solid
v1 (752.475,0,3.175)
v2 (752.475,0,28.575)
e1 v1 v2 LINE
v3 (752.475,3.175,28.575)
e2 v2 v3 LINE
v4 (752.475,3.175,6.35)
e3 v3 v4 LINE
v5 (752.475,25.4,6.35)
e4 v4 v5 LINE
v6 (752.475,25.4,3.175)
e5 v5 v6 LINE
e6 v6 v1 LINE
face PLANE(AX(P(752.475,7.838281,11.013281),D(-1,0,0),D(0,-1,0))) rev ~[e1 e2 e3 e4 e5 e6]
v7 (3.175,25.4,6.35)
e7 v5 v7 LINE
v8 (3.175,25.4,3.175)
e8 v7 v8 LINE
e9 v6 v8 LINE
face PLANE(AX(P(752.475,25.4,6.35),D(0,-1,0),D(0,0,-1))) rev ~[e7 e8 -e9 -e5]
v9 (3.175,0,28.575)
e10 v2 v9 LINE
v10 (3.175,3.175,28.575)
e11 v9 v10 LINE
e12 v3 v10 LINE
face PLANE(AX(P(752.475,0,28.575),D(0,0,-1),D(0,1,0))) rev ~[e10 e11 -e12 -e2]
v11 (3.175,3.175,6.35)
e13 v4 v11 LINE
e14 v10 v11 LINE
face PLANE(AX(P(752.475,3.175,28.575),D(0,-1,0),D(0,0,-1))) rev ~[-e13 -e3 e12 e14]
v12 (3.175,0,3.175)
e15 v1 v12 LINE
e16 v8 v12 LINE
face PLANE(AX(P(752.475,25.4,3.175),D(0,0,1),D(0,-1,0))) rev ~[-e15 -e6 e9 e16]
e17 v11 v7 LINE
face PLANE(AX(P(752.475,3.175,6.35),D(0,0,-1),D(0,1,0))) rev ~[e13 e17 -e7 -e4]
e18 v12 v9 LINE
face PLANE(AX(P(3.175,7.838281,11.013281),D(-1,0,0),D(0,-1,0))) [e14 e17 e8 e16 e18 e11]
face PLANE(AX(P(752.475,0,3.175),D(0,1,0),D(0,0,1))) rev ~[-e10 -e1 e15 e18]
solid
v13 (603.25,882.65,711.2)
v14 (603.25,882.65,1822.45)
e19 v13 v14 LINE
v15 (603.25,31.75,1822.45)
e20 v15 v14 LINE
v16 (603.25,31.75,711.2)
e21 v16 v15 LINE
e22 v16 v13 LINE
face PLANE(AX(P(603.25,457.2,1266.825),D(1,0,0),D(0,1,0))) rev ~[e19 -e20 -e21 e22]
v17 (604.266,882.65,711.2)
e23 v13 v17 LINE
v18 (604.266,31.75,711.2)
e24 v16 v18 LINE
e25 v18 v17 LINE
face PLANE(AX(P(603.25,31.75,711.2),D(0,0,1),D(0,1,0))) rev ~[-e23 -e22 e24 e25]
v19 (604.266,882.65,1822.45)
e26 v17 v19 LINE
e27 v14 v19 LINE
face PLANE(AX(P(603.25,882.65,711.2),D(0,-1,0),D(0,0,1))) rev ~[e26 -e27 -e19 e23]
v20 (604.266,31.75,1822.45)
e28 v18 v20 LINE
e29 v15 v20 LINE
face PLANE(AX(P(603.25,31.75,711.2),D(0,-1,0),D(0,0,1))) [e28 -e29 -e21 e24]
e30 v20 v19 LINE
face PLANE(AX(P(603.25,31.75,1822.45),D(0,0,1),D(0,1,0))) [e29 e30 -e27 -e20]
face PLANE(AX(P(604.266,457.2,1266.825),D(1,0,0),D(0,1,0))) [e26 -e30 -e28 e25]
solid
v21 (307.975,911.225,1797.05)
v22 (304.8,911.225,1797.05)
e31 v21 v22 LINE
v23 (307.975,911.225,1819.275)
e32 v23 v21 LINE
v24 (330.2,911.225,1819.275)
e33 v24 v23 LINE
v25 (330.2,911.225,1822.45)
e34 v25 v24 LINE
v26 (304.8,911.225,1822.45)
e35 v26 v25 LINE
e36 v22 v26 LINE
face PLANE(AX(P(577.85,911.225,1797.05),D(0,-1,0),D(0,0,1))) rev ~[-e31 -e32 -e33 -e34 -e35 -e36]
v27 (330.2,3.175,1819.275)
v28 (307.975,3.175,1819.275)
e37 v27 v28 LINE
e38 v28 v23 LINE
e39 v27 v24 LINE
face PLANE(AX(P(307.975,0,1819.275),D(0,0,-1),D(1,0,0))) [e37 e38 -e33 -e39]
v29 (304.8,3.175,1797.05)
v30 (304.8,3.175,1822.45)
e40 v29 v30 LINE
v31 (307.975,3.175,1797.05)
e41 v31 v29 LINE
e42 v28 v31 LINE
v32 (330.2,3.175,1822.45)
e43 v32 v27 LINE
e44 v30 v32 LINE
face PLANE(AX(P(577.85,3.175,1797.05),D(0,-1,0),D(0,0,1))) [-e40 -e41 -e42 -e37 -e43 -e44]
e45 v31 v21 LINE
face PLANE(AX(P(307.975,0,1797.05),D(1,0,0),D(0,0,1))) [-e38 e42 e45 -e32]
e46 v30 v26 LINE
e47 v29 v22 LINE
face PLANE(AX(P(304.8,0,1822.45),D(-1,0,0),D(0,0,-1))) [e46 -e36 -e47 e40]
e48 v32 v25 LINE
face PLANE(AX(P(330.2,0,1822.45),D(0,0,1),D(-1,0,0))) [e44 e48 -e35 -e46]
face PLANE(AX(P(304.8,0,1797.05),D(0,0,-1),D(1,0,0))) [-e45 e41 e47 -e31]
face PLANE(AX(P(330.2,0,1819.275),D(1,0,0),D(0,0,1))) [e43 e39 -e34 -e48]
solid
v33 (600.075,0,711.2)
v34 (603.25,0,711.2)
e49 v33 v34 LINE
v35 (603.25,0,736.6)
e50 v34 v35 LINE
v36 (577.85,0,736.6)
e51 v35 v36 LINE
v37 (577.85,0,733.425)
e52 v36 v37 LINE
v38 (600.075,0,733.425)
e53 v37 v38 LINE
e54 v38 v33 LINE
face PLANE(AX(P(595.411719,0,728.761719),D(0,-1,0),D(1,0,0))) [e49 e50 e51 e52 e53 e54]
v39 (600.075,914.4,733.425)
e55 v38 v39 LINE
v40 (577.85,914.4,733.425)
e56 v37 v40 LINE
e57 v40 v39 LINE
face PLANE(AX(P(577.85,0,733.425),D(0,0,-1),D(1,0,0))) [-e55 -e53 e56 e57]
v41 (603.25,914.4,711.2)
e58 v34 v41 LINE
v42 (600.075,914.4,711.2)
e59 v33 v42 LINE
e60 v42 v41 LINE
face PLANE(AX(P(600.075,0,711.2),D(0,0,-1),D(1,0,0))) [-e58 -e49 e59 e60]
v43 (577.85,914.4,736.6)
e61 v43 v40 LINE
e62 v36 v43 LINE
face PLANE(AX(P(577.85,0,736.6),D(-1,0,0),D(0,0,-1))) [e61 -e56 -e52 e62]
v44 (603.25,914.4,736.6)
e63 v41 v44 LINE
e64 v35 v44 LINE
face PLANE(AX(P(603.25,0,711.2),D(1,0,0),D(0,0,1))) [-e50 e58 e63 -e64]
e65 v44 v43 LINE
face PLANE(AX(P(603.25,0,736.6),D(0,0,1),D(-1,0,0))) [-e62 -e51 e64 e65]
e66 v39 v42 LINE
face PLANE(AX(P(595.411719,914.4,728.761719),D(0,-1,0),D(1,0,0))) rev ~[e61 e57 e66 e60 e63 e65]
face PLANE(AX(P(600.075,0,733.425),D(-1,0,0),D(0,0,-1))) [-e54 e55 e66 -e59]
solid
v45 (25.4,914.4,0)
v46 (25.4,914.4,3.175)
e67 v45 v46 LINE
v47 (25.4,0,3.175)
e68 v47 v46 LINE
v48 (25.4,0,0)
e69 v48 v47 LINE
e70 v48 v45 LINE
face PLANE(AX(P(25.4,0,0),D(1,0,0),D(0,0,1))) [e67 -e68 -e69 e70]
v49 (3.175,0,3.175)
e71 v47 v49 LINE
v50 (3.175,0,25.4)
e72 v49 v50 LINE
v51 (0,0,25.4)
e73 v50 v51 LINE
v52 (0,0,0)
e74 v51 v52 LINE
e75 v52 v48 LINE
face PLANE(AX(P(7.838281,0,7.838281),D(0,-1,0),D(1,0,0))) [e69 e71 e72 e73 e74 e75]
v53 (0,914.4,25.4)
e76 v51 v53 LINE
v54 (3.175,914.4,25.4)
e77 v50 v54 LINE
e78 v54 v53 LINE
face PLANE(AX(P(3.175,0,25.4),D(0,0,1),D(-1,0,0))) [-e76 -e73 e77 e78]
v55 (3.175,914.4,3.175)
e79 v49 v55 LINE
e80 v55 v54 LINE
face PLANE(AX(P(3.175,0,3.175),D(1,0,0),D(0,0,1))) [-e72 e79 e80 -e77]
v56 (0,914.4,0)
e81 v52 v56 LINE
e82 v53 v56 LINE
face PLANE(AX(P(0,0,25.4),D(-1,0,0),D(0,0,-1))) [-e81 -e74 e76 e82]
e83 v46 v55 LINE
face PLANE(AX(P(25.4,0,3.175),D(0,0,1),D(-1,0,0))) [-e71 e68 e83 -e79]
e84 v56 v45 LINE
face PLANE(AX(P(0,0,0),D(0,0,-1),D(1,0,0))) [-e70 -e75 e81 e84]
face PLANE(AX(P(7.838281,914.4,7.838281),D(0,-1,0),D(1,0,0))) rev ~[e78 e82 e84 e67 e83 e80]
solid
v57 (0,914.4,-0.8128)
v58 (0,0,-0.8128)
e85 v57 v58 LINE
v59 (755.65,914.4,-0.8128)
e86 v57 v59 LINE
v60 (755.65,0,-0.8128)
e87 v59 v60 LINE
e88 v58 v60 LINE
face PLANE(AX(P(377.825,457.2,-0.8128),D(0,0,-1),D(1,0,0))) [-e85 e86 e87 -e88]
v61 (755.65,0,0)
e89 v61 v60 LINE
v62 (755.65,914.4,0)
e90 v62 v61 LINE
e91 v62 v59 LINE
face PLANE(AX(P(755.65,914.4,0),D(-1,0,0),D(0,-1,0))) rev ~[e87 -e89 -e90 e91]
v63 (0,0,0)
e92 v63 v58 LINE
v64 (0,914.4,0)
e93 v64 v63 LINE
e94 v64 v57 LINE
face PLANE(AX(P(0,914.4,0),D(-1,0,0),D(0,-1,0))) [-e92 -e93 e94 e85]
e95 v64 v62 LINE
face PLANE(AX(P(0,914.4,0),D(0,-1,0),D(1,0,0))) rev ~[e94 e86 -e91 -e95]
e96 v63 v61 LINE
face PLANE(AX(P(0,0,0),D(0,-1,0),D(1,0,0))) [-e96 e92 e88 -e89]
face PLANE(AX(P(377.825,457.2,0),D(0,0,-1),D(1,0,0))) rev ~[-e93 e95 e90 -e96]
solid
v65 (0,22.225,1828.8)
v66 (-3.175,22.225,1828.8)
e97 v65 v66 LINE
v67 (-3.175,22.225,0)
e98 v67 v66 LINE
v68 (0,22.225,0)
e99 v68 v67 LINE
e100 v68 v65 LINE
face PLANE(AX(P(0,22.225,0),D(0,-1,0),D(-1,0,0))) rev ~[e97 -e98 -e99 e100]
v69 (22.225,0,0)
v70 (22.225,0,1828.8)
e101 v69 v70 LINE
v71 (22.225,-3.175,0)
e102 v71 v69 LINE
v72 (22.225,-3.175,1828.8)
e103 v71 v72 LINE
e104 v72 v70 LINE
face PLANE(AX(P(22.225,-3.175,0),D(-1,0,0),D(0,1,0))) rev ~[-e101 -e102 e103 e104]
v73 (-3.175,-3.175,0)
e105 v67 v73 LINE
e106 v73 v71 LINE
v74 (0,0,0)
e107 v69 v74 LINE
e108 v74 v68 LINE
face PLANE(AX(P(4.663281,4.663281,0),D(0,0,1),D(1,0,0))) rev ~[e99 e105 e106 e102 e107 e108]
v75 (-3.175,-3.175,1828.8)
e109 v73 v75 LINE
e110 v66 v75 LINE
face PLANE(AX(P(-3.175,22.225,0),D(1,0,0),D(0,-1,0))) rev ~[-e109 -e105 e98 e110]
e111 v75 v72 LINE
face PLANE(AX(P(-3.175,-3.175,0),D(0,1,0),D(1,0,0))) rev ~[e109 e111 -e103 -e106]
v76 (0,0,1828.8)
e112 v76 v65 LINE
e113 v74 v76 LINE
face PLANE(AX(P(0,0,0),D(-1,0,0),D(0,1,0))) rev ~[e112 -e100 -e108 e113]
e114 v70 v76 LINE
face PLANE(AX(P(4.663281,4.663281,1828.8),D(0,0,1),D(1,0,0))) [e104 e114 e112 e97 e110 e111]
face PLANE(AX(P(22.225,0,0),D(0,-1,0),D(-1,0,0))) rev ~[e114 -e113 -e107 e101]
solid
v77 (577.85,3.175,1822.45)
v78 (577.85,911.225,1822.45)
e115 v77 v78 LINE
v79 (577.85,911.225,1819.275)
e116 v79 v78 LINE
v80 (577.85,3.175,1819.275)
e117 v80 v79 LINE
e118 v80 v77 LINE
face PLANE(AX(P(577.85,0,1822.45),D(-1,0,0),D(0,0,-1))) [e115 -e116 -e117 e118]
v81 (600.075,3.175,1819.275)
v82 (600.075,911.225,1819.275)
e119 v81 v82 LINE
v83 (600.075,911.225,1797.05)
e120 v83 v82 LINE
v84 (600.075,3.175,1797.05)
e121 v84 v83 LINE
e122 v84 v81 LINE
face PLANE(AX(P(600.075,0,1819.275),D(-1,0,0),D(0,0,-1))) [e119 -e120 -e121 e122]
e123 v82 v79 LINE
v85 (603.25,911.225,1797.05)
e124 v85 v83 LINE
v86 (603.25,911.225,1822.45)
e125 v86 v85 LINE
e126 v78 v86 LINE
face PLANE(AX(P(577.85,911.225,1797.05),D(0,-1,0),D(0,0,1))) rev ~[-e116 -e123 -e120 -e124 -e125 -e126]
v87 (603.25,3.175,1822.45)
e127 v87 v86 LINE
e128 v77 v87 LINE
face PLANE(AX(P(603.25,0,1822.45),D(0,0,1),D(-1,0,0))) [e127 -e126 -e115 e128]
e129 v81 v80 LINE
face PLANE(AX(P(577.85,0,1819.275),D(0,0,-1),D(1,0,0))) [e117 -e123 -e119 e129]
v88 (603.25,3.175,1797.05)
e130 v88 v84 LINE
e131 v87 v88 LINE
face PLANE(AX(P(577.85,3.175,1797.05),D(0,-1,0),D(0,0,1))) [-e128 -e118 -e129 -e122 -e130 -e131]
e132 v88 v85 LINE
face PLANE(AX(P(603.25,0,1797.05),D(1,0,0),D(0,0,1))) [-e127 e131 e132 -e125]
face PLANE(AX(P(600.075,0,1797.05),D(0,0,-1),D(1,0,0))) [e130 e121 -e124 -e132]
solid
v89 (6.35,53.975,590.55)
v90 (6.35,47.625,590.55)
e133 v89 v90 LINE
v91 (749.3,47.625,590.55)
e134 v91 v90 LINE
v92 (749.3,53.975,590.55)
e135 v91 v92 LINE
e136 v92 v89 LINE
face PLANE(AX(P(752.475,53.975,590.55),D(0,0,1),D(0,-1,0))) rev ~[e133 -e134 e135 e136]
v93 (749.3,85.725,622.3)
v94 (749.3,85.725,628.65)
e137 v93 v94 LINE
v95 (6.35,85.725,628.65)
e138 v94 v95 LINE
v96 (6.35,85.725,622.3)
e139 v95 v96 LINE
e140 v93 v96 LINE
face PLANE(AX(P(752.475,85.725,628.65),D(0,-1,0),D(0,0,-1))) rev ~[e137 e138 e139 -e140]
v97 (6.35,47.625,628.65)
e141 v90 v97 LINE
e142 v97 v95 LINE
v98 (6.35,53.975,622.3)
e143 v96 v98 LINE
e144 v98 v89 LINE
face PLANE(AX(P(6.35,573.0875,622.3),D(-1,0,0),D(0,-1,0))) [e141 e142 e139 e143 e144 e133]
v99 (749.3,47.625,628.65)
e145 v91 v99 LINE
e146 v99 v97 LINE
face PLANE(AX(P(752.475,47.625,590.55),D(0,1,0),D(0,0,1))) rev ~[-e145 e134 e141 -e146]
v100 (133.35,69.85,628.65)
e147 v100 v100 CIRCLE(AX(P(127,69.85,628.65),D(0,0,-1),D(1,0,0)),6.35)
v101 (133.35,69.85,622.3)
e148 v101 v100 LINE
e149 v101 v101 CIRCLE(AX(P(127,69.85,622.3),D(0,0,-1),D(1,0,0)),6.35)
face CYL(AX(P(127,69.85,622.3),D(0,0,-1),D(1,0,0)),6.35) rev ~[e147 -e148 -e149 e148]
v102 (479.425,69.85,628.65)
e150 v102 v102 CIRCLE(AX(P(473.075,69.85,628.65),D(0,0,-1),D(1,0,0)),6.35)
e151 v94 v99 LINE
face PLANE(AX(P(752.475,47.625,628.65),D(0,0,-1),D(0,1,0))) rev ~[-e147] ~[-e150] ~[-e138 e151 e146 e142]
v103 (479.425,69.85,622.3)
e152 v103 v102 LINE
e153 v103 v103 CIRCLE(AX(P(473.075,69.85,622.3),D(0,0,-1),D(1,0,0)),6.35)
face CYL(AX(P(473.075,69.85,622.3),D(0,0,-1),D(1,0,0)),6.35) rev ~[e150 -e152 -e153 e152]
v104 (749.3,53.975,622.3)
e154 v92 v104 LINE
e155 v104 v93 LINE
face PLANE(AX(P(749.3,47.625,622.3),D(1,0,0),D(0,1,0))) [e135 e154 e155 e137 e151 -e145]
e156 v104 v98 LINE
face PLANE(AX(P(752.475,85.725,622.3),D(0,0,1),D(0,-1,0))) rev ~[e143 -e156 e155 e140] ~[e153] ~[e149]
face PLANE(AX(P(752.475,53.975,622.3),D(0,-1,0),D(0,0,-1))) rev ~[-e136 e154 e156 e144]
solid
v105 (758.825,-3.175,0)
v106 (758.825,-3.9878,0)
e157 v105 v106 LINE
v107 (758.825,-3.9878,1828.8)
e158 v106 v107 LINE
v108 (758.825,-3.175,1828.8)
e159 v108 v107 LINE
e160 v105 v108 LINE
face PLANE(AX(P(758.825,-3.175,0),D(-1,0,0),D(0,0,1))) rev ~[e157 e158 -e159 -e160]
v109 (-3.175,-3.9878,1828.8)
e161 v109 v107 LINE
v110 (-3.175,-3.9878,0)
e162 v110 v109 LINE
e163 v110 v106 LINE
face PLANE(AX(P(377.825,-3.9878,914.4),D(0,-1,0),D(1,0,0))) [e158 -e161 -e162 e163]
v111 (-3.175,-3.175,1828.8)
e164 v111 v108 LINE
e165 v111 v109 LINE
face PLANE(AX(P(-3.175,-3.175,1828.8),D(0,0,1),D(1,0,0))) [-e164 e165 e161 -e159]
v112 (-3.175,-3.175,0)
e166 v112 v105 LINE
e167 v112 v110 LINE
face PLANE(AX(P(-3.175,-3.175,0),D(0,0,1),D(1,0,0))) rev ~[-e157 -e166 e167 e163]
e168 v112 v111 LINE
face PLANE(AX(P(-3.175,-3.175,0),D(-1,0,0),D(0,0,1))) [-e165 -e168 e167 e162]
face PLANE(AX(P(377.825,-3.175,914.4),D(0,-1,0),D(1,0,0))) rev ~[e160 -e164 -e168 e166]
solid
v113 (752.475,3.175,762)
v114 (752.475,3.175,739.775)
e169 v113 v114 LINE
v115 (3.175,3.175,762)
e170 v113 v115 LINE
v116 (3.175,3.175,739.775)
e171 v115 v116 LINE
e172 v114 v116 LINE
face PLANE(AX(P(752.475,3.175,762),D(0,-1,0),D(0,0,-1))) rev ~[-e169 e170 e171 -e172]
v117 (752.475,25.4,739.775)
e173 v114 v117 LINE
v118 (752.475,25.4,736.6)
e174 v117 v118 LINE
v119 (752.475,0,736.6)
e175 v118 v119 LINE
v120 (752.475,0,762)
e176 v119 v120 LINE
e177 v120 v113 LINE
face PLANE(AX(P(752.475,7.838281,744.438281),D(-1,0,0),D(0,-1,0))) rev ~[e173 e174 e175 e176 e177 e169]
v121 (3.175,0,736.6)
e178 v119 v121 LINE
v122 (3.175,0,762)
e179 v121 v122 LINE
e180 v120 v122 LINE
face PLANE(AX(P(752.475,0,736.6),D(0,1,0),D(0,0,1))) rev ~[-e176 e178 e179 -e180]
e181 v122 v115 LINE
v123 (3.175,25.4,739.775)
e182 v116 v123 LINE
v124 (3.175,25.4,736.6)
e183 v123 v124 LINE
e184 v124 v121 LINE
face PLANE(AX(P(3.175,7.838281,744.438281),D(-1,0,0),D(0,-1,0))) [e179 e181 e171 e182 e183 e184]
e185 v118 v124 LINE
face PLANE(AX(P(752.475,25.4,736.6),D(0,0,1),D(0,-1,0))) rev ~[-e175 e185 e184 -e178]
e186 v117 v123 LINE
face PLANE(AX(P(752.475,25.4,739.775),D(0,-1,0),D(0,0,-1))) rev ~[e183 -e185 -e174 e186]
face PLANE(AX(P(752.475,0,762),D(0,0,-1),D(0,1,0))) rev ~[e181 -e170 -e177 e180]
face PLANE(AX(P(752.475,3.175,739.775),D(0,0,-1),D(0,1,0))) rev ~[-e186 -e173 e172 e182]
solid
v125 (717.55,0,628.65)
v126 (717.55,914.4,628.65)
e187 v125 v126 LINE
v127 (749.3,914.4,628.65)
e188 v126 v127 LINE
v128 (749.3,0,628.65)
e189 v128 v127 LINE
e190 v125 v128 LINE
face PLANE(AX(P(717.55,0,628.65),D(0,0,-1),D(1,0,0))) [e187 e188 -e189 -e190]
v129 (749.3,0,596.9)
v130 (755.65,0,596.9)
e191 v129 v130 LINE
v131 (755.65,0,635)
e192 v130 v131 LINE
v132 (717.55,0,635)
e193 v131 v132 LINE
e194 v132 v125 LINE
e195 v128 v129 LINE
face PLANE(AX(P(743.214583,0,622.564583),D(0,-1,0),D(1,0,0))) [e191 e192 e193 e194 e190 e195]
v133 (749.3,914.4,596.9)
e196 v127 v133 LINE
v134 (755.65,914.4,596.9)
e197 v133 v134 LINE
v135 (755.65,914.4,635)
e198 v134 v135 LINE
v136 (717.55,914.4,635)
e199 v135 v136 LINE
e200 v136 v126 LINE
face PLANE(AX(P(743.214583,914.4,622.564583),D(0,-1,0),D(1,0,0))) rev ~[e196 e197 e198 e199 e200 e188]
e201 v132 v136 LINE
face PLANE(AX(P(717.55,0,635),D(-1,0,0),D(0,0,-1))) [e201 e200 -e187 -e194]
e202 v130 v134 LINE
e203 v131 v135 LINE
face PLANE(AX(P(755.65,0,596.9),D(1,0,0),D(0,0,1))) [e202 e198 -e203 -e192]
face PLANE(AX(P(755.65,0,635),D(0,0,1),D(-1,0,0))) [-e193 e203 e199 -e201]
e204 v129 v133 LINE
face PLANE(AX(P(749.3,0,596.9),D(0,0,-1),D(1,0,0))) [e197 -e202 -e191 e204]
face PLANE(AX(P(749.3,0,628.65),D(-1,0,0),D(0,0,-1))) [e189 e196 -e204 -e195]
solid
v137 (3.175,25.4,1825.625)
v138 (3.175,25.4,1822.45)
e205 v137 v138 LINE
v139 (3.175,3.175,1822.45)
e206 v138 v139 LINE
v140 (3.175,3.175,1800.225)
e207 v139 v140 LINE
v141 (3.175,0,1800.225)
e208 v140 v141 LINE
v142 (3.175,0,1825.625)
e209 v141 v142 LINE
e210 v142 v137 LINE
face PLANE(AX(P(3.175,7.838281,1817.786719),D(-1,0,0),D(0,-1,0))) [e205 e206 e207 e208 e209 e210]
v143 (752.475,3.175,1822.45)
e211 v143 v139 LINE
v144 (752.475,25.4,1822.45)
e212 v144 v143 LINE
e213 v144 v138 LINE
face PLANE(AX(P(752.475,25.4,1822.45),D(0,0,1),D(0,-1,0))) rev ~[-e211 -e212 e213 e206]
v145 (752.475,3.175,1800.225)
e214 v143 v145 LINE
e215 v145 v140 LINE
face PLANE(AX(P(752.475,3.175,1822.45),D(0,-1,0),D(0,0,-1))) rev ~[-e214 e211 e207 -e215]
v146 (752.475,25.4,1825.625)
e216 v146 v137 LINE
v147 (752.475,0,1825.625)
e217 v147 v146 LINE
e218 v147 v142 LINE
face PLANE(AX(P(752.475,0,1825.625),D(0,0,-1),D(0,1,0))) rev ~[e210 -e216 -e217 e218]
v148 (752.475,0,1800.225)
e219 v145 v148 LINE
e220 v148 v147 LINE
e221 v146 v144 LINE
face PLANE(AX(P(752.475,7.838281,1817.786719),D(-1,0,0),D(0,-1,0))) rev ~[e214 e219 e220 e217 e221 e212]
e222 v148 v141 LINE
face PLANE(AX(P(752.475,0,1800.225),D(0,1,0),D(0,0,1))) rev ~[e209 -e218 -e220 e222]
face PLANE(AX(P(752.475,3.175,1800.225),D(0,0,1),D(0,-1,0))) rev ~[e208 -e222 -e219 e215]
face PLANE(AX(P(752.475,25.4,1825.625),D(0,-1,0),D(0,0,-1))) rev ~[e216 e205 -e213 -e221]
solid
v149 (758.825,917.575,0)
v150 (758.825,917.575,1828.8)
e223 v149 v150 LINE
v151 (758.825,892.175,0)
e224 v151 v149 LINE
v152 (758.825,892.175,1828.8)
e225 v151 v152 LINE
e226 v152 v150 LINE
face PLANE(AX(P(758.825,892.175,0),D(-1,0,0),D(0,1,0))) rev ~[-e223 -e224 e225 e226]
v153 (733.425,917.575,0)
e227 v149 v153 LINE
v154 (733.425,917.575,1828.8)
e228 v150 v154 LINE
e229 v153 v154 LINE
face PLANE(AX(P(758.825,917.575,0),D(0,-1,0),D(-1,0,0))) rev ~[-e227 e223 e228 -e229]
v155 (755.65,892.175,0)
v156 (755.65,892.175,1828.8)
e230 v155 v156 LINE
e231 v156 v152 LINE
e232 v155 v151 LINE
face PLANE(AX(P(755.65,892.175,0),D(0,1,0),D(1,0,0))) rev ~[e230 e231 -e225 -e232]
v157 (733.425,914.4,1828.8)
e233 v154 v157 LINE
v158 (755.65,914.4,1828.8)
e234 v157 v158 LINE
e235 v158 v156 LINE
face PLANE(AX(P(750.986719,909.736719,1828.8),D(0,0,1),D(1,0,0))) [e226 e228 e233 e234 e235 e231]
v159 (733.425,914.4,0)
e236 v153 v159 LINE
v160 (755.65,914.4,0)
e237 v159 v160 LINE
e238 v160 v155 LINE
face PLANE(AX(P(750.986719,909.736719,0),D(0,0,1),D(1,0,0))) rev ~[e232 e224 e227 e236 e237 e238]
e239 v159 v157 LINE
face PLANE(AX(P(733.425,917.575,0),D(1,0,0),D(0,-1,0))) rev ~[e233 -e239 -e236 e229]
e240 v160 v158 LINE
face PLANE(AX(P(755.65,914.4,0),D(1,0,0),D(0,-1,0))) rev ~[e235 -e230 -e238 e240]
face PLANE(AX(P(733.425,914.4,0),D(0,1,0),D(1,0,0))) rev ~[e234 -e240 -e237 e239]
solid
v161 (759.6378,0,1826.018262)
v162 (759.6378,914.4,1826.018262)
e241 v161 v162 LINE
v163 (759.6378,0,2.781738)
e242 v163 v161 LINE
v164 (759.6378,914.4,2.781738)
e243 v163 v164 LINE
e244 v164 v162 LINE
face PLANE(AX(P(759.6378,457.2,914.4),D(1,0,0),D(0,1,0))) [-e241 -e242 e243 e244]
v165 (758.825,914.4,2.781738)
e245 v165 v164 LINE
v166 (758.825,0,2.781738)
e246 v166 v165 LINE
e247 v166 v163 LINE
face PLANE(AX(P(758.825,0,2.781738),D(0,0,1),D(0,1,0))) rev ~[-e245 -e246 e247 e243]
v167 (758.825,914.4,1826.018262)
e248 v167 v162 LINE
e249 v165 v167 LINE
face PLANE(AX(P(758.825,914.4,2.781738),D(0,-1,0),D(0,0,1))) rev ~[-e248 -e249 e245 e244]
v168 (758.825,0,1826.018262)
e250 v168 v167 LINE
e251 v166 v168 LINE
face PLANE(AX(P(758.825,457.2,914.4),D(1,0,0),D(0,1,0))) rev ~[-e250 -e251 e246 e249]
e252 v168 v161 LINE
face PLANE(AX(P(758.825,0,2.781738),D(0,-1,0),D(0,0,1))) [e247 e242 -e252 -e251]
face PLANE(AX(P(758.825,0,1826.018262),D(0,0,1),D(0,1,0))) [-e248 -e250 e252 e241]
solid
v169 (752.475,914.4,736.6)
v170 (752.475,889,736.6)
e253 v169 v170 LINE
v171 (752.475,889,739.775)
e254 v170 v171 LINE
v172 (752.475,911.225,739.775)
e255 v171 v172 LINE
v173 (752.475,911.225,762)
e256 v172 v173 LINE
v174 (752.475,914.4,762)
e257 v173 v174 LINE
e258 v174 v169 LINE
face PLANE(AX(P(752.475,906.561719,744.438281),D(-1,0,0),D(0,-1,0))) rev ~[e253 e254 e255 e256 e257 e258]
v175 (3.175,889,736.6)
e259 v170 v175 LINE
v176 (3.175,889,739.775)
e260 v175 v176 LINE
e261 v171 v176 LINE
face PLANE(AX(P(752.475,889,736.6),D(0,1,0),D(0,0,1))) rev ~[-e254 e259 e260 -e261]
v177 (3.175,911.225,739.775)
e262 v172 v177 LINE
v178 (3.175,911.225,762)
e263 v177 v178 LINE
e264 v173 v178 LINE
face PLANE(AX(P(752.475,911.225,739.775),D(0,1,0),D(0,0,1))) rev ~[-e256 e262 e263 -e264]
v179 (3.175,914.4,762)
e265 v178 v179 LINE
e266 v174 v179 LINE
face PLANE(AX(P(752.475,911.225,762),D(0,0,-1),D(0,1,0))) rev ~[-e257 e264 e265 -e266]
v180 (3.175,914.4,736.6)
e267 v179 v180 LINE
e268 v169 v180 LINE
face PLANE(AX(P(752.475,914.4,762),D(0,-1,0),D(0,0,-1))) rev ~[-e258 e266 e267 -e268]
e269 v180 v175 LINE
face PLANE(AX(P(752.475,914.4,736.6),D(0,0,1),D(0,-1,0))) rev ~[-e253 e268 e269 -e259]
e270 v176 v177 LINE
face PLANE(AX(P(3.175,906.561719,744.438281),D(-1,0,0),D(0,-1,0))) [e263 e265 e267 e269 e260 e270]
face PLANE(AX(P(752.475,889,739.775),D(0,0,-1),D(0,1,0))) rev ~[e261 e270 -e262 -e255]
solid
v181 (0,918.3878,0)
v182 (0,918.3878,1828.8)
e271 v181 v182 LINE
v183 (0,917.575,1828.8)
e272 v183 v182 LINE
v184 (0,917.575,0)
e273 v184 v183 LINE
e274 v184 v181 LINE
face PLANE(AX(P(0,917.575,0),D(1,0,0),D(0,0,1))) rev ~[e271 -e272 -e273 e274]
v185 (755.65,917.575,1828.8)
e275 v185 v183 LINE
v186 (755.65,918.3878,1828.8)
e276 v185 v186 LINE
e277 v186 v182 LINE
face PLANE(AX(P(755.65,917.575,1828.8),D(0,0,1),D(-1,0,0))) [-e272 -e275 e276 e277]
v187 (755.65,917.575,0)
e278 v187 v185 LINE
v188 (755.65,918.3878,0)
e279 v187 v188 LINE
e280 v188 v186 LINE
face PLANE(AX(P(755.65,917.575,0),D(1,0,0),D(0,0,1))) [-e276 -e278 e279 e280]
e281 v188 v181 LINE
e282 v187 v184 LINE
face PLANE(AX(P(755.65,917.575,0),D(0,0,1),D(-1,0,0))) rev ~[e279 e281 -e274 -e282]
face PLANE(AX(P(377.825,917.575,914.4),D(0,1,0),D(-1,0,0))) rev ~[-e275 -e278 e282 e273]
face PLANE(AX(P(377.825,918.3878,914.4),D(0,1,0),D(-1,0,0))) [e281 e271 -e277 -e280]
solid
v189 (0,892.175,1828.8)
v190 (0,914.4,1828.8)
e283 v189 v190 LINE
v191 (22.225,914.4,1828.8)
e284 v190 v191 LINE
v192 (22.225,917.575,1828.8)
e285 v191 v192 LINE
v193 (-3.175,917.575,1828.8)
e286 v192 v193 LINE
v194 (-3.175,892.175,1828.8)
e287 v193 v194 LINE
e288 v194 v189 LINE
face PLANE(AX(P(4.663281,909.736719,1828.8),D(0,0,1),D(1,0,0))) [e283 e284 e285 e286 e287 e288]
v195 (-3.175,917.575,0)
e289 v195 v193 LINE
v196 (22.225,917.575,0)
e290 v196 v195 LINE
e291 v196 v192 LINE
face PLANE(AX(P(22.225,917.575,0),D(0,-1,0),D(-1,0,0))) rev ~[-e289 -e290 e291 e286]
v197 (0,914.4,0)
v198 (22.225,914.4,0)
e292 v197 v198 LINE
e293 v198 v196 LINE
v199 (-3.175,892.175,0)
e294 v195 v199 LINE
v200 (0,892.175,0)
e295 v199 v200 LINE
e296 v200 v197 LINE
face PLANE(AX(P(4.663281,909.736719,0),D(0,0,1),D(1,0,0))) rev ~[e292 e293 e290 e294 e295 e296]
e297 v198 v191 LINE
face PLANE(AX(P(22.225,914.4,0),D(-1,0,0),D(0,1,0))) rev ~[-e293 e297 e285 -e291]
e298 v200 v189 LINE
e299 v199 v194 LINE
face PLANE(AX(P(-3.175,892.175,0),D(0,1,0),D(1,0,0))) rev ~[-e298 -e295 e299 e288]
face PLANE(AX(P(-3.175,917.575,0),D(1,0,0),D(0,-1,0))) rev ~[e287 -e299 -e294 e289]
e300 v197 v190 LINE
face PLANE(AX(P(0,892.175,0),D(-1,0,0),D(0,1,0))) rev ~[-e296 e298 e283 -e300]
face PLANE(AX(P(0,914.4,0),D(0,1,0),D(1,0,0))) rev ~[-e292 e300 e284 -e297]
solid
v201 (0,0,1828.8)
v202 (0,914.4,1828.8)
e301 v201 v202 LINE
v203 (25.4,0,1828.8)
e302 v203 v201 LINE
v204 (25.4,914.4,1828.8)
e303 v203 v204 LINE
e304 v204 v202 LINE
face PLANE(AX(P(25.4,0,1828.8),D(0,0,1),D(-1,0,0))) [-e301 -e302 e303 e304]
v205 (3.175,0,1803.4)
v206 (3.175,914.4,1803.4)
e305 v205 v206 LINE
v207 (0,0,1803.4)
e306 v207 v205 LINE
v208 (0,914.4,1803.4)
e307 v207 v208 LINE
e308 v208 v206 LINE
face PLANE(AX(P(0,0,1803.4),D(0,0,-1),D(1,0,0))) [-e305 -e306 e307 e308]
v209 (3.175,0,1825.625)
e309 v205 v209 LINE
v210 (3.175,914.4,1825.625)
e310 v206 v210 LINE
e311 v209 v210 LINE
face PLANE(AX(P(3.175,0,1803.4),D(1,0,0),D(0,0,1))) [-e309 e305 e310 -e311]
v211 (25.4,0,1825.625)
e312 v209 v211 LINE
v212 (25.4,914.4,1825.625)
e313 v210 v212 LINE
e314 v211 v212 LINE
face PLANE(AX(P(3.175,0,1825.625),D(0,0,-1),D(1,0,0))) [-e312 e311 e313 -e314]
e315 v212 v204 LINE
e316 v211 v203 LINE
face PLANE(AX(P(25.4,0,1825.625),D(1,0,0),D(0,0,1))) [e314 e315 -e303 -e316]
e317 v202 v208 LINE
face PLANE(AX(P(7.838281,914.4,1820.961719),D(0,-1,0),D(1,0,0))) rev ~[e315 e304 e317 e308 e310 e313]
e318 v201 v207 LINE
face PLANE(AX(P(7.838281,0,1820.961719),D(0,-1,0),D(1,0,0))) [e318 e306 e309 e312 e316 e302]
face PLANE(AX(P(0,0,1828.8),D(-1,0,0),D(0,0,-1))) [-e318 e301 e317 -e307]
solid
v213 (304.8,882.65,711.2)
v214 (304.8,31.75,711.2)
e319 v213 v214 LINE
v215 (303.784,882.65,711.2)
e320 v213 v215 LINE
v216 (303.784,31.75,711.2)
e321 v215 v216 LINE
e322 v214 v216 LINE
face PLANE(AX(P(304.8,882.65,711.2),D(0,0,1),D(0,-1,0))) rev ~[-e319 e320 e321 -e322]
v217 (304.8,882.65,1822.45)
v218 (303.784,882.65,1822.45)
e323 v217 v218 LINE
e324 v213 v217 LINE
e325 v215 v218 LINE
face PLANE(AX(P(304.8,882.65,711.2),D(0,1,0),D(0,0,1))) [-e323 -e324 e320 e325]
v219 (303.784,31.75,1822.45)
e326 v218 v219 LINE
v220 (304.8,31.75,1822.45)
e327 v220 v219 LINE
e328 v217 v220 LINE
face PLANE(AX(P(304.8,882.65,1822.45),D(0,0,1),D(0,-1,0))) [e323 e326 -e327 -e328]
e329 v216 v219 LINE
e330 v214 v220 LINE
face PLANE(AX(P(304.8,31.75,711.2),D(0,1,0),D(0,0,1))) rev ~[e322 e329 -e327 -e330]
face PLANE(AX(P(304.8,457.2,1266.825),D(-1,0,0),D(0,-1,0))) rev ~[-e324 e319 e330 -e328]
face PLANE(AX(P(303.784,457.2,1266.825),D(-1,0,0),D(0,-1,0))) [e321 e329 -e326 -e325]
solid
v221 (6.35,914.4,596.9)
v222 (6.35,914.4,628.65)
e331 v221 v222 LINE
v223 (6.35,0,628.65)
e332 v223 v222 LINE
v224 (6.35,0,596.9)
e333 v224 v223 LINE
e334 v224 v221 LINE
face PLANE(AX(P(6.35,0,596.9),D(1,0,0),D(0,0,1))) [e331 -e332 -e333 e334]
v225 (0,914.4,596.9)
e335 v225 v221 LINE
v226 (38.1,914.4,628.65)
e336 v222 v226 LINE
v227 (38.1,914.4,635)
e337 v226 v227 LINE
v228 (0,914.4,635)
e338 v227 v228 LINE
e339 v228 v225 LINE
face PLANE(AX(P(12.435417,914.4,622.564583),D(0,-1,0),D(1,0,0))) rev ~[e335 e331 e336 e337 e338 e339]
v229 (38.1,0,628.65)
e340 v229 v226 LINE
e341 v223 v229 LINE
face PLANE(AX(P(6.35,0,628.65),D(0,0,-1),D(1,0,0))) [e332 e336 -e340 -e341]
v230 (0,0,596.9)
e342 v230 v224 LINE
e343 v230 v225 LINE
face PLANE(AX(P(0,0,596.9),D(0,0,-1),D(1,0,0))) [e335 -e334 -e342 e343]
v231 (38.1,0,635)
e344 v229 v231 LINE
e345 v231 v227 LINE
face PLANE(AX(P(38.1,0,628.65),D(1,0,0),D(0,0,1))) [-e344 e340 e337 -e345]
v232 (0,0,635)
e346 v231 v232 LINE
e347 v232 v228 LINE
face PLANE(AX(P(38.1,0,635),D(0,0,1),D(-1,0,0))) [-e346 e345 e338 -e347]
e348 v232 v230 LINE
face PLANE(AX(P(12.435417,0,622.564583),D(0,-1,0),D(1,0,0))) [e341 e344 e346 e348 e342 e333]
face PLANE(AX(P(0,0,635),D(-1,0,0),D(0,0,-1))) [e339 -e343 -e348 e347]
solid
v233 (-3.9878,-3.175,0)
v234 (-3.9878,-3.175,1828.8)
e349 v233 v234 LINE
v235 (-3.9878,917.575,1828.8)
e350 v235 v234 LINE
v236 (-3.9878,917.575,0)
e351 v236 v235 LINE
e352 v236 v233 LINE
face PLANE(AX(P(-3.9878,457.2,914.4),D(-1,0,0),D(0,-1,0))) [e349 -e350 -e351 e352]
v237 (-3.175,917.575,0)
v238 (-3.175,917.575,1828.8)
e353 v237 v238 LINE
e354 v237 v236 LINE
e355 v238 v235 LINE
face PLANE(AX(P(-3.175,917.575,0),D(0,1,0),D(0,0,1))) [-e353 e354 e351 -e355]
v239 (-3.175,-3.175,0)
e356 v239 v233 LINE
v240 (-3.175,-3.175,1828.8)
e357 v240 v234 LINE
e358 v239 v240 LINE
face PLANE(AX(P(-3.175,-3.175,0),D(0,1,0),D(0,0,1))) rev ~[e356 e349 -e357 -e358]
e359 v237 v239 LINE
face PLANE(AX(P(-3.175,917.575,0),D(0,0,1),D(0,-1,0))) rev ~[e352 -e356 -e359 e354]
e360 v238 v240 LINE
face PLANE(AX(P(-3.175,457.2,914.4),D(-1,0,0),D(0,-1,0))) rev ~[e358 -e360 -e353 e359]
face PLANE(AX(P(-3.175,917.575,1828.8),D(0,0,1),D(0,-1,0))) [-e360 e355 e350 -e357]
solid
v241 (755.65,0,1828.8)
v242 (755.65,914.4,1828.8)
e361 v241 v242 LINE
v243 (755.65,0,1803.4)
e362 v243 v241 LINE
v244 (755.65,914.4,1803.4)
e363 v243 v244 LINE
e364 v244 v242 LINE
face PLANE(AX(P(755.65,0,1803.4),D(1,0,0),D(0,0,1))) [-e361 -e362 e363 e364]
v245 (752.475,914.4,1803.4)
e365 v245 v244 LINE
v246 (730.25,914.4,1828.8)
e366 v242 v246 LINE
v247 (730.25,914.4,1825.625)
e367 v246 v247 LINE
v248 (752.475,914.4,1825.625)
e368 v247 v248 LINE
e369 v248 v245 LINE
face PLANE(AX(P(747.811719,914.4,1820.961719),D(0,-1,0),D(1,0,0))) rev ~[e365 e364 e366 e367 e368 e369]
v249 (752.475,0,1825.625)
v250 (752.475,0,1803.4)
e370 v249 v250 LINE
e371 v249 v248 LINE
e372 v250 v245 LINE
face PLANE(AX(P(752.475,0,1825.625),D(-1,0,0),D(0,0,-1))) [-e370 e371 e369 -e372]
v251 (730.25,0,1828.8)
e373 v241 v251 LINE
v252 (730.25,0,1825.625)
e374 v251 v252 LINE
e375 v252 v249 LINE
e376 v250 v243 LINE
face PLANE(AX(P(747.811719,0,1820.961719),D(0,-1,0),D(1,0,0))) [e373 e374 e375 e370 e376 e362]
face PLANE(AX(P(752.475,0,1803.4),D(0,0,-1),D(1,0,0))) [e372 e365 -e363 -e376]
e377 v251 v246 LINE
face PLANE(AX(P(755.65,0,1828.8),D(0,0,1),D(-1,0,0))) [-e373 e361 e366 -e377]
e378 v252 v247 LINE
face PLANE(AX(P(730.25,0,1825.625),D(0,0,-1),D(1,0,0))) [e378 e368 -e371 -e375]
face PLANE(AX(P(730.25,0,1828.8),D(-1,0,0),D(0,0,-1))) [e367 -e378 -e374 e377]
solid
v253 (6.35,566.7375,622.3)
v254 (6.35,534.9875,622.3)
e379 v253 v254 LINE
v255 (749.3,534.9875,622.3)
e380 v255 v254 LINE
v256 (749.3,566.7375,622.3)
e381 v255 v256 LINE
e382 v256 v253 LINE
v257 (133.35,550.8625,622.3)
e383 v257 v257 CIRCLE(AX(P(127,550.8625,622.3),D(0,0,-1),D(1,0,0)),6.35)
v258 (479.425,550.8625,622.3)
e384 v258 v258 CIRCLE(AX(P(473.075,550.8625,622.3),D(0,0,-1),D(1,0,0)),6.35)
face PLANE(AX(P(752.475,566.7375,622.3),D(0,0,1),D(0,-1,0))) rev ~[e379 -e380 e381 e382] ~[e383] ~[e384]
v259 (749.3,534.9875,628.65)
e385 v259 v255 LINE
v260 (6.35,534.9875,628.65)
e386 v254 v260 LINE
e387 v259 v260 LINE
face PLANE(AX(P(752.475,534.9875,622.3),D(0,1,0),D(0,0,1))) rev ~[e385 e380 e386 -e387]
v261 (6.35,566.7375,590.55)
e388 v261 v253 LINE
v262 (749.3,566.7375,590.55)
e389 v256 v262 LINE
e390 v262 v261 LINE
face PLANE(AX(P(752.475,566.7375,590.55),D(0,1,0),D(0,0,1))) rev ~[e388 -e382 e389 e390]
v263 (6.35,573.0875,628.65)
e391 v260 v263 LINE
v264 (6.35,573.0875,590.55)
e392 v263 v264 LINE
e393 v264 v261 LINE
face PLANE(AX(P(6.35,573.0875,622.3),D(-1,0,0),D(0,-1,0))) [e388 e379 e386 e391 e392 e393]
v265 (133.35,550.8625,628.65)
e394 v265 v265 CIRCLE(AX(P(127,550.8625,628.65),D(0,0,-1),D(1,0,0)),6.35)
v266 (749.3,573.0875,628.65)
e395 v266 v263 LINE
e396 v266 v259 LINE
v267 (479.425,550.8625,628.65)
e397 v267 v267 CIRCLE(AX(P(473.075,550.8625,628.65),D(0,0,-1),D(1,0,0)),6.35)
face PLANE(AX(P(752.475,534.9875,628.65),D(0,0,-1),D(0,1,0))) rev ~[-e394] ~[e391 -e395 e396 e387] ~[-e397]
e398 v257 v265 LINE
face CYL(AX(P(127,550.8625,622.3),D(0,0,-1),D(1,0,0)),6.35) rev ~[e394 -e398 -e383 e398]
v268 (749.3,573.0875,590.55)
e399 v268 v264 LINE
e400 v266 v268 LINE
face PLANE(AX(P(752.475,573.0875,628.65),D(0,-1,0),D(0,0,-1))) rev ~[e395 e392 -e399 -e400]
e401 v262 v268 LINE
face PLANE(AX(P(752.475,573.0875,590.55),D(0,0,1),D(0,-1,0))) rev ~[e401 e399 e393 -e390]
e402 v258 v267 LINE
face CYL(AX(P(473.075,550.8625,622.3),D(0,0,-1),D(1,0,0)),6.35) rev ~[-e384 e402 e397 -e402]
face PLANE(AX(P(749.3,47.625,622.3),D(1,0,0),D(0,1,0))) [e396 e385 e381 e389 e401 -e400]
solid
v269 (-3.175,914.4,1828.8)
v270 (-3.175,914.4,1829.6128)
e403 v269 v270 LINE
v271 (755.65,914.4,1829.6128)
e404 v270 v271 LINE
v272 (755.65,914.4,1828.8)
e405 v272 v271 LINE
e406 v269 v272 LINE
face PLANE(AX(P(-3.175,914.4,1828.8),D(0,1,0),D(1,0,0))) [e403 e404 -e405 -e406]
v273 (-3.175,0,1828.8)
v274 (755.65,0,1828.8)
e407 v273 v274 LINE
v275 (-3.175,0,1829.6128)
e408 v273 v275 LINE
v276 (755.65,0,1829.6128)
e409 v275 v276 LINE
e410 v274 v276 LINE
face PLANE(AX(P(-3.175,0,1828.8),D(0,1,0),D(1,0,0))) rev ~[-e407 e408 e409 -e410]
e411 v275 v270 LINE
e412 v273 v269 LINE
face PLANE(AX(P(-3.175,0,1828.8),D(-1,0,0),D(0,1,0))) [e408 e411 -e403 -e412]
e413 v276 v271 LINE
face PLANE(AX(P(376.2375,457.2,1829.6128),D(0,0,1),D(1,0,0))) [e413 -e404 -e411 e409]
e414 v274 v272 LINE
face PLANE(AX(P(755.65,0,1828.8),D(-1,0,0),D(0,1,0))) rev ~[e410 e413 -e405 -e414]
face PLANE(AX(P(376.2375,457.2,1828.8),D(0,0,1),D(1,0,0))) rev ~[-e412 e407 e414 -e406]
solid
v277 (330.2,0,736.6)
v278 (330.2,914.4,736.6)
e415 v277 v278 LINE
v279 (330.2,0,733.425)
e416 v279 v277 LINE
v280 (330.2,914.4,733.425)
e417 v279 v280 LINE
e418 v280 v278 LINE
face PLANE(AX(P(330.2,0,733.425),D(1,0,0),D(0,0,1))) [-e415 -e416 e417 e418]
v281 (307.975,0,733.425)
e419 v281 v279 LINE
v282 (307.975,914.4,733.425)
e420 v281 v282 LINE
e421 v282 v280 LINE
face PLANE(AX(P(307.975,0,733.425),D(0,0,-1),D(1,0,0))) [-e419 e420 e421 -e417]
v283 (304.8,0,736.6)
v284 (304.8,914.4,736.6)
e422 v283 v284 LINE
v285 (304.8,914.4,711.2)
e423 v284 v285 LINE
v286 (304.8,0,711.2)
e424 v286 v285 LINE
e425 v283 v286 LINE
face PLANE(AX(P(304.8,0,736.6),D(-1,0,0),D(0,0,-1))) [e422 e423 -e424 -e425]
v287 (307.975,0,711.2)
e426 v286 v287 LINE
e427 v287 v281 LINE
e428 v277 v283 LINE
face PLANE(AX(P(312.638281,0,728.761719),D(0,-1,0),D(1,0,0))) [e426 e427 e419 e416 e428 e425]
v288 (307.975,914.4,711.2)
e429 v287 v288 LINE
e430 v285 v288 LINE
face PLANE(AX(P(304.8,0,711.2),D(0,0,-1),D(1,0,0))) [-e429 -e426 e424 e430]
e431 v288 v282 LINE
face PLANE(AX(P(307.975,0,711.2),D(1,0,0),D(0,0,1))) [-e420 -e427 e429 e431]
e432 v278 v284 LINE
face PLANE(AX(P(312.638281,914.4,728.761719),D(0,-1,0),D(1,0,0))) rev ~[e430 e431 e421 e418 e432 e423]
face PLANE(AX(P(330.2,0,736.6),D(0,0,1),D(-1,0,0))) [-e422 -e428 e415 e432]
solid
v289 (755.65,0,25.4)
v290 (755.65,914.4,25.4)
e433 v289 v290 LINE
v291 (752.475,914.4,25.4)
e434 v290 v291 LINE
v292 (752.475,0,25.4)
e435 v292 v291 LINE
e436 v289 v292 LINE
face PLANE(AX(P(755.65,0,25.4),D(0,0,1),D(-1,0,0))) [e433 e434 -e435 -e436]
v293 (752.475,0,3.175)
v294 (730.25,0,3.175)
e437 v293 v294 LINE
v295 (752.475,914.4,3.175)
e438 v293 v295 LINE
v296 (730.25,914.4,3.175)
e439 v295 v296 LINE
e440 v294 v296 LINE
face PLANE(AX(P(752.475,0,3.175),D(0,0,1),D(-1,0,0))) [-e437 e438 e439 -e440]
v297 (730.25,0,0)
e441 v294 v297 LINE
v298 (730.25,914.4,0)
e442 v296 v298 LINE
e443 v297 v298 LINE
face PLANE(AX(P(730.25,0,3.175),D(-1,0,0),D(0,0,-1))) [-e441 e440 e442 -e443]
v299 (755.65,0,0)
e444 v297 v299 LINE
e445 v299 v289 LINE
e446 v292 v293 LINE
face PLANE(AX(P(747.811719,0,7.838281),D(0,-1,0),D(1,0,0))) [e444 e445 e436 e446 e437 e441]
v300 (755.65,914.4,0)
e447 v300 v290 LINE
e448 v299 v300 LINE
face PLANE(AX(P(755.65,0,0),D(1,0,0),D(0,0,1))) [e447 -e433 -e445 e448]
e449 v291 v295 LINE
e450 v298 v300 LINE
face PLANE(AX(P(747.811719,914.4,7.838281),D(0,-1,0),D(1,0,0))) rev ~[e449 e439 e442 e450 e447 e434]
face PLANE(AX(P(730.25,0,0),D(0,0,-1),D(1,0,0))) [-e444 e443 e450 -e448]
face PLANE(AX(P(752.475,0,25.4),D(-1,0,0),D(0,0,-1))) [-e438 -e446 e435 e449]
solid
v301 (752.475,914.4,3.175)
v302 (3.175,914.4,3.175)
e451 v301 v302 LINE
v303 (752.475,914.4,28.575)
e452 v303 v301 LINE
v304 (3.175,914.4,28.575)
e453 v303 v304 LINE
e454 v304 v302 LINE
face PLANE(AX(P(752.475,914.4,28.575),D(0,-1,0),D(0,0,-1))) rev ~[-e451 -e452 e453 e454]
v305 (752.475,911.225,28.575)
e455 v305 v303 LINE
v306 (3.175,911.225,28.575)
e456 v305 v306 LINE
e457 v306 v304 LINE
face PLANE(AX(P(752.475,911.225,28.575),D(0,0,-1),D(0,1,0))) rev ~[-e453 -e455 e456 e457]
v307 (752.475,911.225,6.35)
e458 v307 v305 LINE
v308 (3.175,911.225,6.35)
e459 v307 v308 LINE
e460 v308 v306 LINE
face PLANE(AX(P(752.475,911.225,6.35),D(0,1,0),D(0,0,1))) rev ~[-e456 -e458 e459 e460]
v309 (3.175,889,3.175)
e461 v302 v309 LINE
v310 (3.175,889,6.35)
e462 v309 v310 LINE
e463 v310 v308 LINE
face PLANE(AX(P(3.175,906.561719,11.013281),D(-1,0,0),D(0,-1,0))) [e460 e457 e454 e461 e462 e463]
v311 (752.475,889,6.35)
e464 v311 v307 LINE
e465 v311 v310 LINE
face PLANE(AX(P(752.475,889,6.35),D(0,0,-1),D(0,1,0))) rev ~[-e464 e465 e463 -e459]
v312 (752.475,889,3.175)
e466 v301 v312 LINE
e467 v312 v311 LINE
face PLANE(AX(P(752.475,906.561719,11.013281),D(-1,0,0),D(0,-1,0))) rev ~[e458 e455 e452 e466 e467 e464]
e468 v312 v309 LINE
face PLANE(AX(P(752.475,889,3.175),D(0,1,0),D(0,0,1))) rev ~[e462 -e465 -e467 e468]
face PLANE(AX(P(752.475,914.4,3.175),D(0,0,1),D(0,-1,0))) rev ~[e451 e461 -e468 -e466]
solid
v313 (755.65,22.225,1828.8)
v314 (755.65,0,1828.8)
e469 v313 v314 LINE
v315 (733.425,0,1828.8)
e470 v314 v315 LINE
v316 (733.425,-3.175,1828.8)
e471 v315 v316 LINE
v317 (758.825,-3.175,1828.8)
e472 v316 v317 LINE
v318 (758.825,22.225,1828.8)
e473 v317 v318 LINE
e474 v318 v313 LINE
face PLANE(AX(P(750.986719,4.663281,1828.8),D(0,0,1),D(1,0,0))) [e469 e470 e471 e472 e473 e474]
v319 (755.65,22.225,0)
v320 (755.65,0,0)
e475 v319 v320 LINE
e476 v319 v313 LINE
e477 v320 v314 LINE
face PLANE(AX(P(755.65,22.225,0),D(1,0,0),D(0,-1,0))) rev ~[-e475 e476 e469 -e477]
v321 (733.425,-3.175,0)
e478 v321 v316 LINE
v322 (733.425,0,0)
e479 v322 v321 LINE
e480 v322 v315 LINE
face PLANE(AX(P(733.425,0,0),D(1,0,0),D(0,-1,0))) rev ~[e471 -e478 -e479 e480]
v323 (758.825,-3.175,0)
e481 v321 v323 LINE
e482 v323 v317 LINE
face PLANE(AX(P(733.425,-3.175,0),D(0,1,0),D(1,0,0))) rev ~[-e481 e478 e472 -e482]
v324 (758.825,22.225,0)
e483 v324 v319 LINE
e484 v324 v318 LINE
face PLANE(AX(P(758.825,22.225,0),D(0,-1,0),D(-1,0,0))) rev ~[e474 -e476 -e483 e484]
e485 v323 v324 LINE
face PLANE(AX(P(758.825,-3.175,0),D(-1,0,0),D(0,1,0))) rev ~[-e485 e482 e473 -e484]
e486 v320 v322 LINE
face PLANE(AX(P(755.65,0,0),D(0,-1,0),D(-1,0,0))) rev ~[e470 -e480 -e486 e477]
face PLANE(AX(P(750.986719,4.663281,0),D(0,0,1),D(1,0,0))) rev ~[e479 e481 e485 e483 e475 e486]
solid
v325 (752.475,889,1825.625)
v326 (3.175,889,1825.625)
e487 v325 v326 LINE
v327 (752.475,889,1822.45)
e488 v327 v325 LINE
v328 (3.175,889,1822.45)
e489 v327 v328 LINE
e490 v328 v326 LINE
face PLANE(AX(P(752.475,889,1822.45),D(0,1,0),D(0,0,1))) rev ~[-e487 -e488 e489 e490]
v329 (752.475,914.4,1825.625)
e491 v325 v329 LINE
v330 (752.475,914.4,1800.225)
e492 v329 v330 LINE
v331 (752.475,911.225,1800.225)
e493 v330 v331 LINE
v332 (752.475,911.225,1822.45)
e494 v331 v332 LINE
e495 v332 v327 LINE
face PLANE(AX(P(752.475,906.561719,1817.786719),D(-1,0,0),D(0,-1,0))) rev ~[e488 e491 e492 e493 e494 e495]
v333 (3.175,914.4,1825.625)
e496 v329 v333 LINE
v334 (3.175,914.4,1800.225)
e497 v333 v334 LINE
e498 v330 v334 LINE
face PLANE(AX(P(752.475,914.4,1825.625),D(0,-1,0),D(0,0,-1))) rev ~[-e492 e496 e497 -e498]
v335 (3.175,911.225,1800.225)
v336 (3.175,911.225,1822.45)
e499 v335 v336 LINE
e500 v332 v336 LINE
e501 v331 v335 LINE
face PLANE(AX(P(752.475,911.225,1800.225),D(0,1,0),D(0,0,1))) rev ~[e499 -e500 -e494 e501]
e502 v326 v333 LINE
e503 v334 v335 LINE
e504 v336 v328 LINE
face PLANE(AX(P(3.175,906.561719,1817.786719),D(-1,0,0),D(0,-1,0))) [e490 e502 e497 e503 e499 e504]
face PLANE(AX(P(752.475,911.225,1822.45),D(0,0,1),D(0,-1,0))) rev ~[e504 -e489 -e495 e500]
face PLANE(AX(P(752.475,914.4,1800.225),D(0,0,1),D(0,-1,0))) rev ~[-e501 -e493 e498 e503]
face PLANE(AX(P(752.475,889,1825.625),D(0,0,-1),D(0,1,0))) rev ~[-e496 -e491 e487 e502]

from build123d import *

# Parameters (mm, degrees)
F1_DEPTH       = 914.4
F3_DEPTH       = 1828.8
F5_DEPTH       = 749.3
F6_R           = 6.35
F6_W           = 3.175
F6_H           = 487.3625
F6_H_2         = 6.35
F6_H_3         = 31.75
F7_DEPTH       = 50.8
F7_DEPTH_BACK  = 50.8
F8_W           = 850.9
F8_H           = 1111.25
F9_DEPTH       = 1.016
F10_W          = 3.175
F10_H          = 25.4
F11_DEPTH      = 581.026
F11_DEPTH_BACK = 180.976
F13_W          = 850.9
F13_H          = 1111.25
F14_DEPTH      = 1.016
F12_W          = 914.4
F12_H          = 1823.2365249493
F16_DEPTH      = 0.8128
F15_W          = 920.75
F15_H          = 1828.8
F17_DEPTH      = 0.8128
F18_W          = 758.825
F18_H          = 914.4
F19_DEPTH      = 0.8128
F20_W          = 755.65
F20_H          = 914.4
F21_DEPTH      = 0.8128
F22_W          = 755.65
F22_H          = 1828.8
F23_DEPTH      = 0.8128
F24_W          = 762
F24_H          = 1828.8
F25_DEPTH      = 0.8128


with BuildPart() as f1:
    # F0 (on Front) → F1 (new body)
    with BuildSketch(Plane.XZ):
        Polygon((0, 25.4), (0, 0), (25.4, 0), (25.4, 3.175), (3.175, 3.175), (3.175, 25.4), align=None)
    extrude(amount=-F1_DEPTH)


with BuildPart() as f1b:
    # F0 (on Front) → F1, piece 2 (new body)
    with BuildSketch(Plane.XZ):
        Polygon((730.25, 3.175), (730.25, 0), (755.65, 0), (755.65, 25.4), (752.475, 25.4), (752.475, 3.175), align=None)
    extrude(amount=-F1_DEPTH)


with BuildPart() as f1c:
    # F0 (on Front) → F1, piece 3 (new body)
    with BuildSketch(Plane.XZ):
        Polygon((755.65, 1828.8), (730.25, 1828.8), (730.25, 1825.625), (752.475, 1825.625), (752.475, 1803.4), (755.65, 1803.4), align=None)
    extrude(amount=-F1_DEPTH)


with BuildPart() as f1d:
    # F0 (on Front) → F1, piece 4 (new body)
    with BuildSketch(Plane.XZ):
        Polygon((0, 1828.8), (0, 1803.4), (3.175, 1803.4), (3.175, 1825.625), (25.4, 1825.625), (25.4, 1828.8), align=None)
    extrude(amount=-F1_DEPTH)


with BuildPart() as f1e:
    # F0 (on Front) → F1, piece 5 (new body)
    with BuildSketch(Plane.XZ):
        Polygon((755.65, 635), (717.55, 635), (717.55, 628.65), (749.3, 628.65), (749.3, 596.9), (755.65, 596.9), align=None)
    extrude(amount=-F1_DEPTH)


with BuildPart() as f1f:
    # F0 (on Front) → F1, piece 6 (new body)
    with BuildSketch(Plane.XZ):
        Polygon((0, 635), (0, 596.9), (6.35, 596.9), (6.35, 628.65), (38.1, 628.65), (38.1, 635), align=None)
    extrude(amount=-F1_DEPTH)


with BuildPart() as f1g:
    # F0 (on Front) → F1, piece 7 (new body)
    with BuildSketch(Plane.XZ):
        Polygon((603.25, 736.6), (577.85, 736.6), (577.85, 733.425), (600.075, 733.425), (600.075, 711.2), (603.25, 711.2), align=None)
    extrude(amount=-F1_DEPTH)


with BuildPart() as f1h:
    # F0 (on Front) → F1, piece 8 (new body)
    with BuildSketch(Plane.XZ):
        Polygon((603.25, 1822.45), (577.85, 1822.45), (577.85, 1819.275), (600.075, 1819.275), (600.075, 1797.05), (603.25, 1797.05), align=None)
    extrude(amount=-F1_DEPTH)


with BuildPart() as f1i:
    # F0 (on Front) → F1, piece 9 (new body)
    with BuildSketch(Plane.XZ):
        Polygon((330.2, 733.425), (330.2, 736.6), (304.8, 736.6), (304.8, 711.2), (307.975, 711.2), (307.975, 733.425), align=None)
    extrude(amount=-F1_DEPTH)


with BuildPart() as f1j:
    # F0 (on Front) → F1, piece 10 (new body)
    with BuildSketch(Plane.XZ):
        Polygon((330.2, 1819.275), (330.2, 1822.45), (304.8, 1822.45), (304.8, 1797.05), (307.975, 1797.05), (307.975, 1819.275), align=None)
    extrude(amount=-F1_DEPTH)


with BuildPart() as f3:
    # F2 (on Top) → F3 (new body)
    with BuildSketch(Plane.XY):
        Polygon((0, 22.225), (-3.175, 22.225), (-3.175, -3.175), (22.225, -3.175), (22.225, 0), (0, 0), align=None)
    extrude(amount=F3_DEPTH)


with BuildPart() as f3b:
    # F2 (on Top) → F3, piece 2 (new body)
    with BuildSketch(Plane.XY):
        Polygon((733.425, 0), (733.425, -3.175), (758.825, -3.175), (758.825, 22.225), (755.65, 22.225), (755.65, 0), align=None)
    extrude(amount=F3_DEPTH)


with BuildPart() as f3c:
    # F2 (on Top) → F3, piece 3 (new body)
    with BuildSketch(Plane.XY):
        Polygon((-3.175, 892.175), (0, 892.175), (0, 914.4), (22.225, 914.4), (22.225, 917.575), (-3.175, 917.575), align=None)
    extrude(amount=F3_DEPTH)


with BuildPart() as f3d:
    # F2 (on Top) → F3, piece 4 (new body)
    with BuildSketch(Plane.XY):
        Polygon((733.425, 917.575), (733.425, 914.4), (755.65, 914.4), (755.65, 892.175), (758.825, 892.175), (758.825, 917.575), align=None)
    extrude(amount=F3_DEPTH)


with BuildPart() as f5:
    # F4 (on face) → F5 (new body, through all)
    with BuildSketch(Plane(origin=(752.475, 0, 0), x_dir=(0, -1, 0), z_dir=(-1, 0, 0))):
        Polygon((-25.4, 6.35), (-25.4, 3.175), (0, 3.175), (0, 28.575), (-3.175, 28.575), (-3.175, 6.35), align=None)
    extrude(amount=F5_DEPTH)


with BuildPart() as f5b:
    # F4 (on face) → F5, piece 2 (new body, through all)
    with BuildSketch(Plane(origin=(752.475, 0, 0), x_dir=(0, -1, 0), z_dir=(-1, 0, 0))):
        Polygon((-3.175, 1800.225), (0, 1800.225), (0, 1825.625), (-25.4, 1825.625), (-25.4, 1822.45), (-3.175, 1822.45), align=None)
    extrude(amount=F5_DEPTH)


with BuildPart() as f5c:
    # F4 (on face) → F5, piece 3 (new body, through all)
    with BuildSketch(Plane(origin=(752.475, 0, 0), x_dir=(0, -1, 0), z_dir=(-1, 0, 0))):
        Polygon((-914.4, 1825.625), (-914.4, 1800.225), (-911.225, 1800.225), (-911.225, 1822.45), (-889, 1822.45), (-889, 1825.625), align=None)
    extrude(amount=F5_DEPTH)


with BuildPart() as f5d:
    # F4 (on face) → F5, piece 4 (new body, through all)
    with BuildSketch(Plane(origin=(752.475, 0, 0), x_dir=(0, -1, 0), z_dir=(-1, 0, 0))):
        Polygon((-911.225, 28.575), (-914.4, 28.575), (-914.4, 3.175), (-889, 3.175), (-889, 6.35), (-911.225, 6.35), align=None)
    extrude(amount=F5_DEPTH)


with BuildPart() as f5e:
    # F4 (on face) → F5, piece 5 (new body, through all)
    with BuildSketch(Plane(origin=(752.475, 0, 0), x_dir=(0, -1, 0), z_dir=(-1, 0, 0))):
        Polygon((-573.0875, 628.65), (-573.0875, 590.55), (-566.7375, 590.55), (-566.7375, 622.3), (-534.9875, 622.3), (-534.9875, 628.65), align=None)
    extrude(amount=F5_DEPTH)


with BuildPart() as f5f:
    # F4 (on face) → F5, piece 6 (new body, through all)
    with BuildSketch(Plane(origin=(752.475, 0, 0), x_dir=(0, -1, 0), z_dir=(-1, 0, 0))):
        Polygon((-53.975, 590.55), (-47.625, 590.55), (-47.625, 628.65), (-85.725, 628.65), (-85.725, 622.3), (-53.975, 622.3), align=None)
    extrude(amount=F5_DEPTH)


with BuildPart() as f5g:
    # F4 (on face) → F5, piece 7 (new body, through all)
    with BuildSketch(Plane(origin=(752.475, 0, 0), x_dir=(0, -1, 0), z_dir=(-1, 0, 0))):
        Polygon((-25.4, 736.6), (0, 736.6), (0, 762), (-3.175, 762), (-3.175, 739.775), (-25.4, 739.775), align=None)
    extrude(amount=F5_DEPTH)


with BuildPart() as f5h:
    # F4 (on face) → F5, piece 8 (new body, through all)
    with BuildSketch(Plane(origin=(752.475, 0, 0), x_dir=(0, -1, 0), z_dir=(-1, 0, 0))):
        Polygon((-914.4, 736.6), (-889, 736.6), (-889, 739.775), (-911.225, 739.775), (-911.225, 762), (-914.4, 762), align=None)
    extrude(amount=F5_DEPTH)


with BuildPart() as f7_tool:
    # F6 (on face) → F7 (new body, two sides)
    with BuildSketch(Plane(origin=(0, 0, 622.3), x_dir=(1, 0, 0), z_dir=(0, 0, -1))) as f7_sk:
        with Locations((473.075, -69.85)):
            Circle(F6_R)
        with Locations((473.075, -550.8625)):
            Circle(F6_R)
        with Locations((127, -550.8625)):
            Circle(F6_R)
        with Locations((127, -69.85)):
            Circle(F6_R)
        with Locations((4.7625, -291.30625)):
            Rectangle(F6_W, F6_H)
        with Locations((750.8875, -291.30625)):
            Rectangle(F6_W, F6_H)
        with Locations((4.7625, -569.9125)):
            Rectangle(F6_W, F6_H_2)
        with Locations((4.7625, -550.8625)):
            Rectangle(F6_W, F6_H_3)
        with Locations((750.8875, -550.8625)):
            Rectangle(F6_W, F6_H_3)
        with Locations((750.8875, -569.9125)):
            Rectangle(F6_W, F6_H_2)
    extrude(amount=-F7_DEPTH)
    extrude(f7_sk.sketch, amount=F7_DEPTH_BACK)


with BuildPart() as f5e_1:
    add(f5e.part)

    # F7: cut by f7_tool
    add(f7_tool.part, mode=Mode.SUBTRACT)


with BuildPart() as f5f_1:
    add(f5f.part)

    # F7: cut by f7_tool
    add(f7_tool.part, mode=Mode.SUBTRACT)


with BuildPart() as f9:
    # F8 (on face) → F9 (new body)
    with BuildSketch(Plane.YZ.offset(603.25)):
        with Locations((457.2, 1266.825)):
            Rectangle(F8_W, F8_H)
    extrude(amount=F9_DEPTH)


with BuildPart() as f11_tool:
    # F10 (on face) → F11 (new body, two sides)
    with BuildSketch(Plane(origin=(577.85, 0, 0), x_dir=(0, -1, 0), z_dir=(-1, 0, 0))) as f11_sk:
        with Locations((-1.5875, 1809.75)):
            Rectangle(F10_W, F10_H)
        with Locations((-912.8125, 1809.75)):
            Rectangle(F10_W, F10_H)
    extrude(amount=F11_DEPTH)
    extrude(f11_sk.sketch, amount=-F11_DEPTH_BACK)


with BuildPart() as f1h_1:
    add(f1h.part)

    # F11: cut by f11_tool
    add(f11_tool.part, mode=Mode.SUBTRACT)


with BuildPart() as f1j_1:
    add(f1j.part)

    # F11: cut by f11_tool
    add(f11_tool.part, mode=Mode.SUBTRACT)


with BuildPart() as f14:
    # F13 (on face) → F14 (new body)
    with BuildSketch(Plane(origin=(304.8, 0, 0), x_dir=(0, -1, 0), z_dir=(-1, 0, 0))):
        with Locations((-457.2, 1266.825)):
            Rectangle(F13_W, F13_H)
    extrude(amount=F14_DEPTH)


with BuildPart() as f16:
    # F12 (on face) → F16 (new body)
    with BuildSketch(Plane.YZ.offset(758.825)):
        with Locations((457.2, 914.4)):
            Rectangle(F12_W, F12_H)
    extrude(amount=F16_DEPTH)


with BuildPart() as f17:
    # F15 (on face) → F17 (new body)
    with BuildSketch(Plane(origin=(-3.175, 0, 0), x_dir=(0, -1, 0), z_dir=(-1, 0, 0))):
        with Locations((-457.2, 914.4)):
            Rectangle(F15_W, F15_H)
    extrude(amount=F17_DEPTH)


with BuildPart() as f19:
    # F18 (on face) → F19 (new body)
    with BuildSketch(Plane.XY.offset(1828.8)):
        with Locations((376.2375, 457.2)):
            Rectangle(F18_W, F18_H)
    extrude(amount=F19_DEPTH)


with BuildPart() as f21:
    # F20 (on face) → F21 (new body)
    with BuildSketch(Plane(origin=(0, 0, 0), x_dir=(1, 0, 0), z_dir=(0, 0, -1))):
        with Locations((377.825, -457.2)):
            Rectangle(F20_W, F20_H)
    extrude(amount=F21_DEPTH)


with BuildPart() as f23:
    # F22 (on face) → F23 (new body)
    with BuildSketch(Plane(origin=(0, 917.575, 0), x_dir=(-1, 0, 0), z_dir=(0, 1, 0))):
        with Locations((-377.825, 914.4)):
            Rectangle(F22_W, F22_H)
    extrude(amount=F23_DEPTH)


with BuildPart() as f25:
    # F24 (on face) → F25 (new body)
    with BuildSketch(Plane.XZ.offset(3.175)):
        with Locations((377.825, 914.4)):
            Rectangle(F24_W, F24_H)
    extrude(amount=F25_DEPTH)


solid = Compound([f1.part, f1b.part, f1c.part, f1d.part, f1e.part, f1f.part, f1g.part, f1i.part, f3.part, f3b.part, f3c.part, f3d.part, f5.part, f5b.part, f5c.part, f5d.part, f5g.part, f5h.part, f5e_1.part, f5f_1.part, f9.part, f1h_1.part, f1j_1.part, f14.part, f16.part, f17.part, f19.part, f21.part, f23.part, f25.part])
